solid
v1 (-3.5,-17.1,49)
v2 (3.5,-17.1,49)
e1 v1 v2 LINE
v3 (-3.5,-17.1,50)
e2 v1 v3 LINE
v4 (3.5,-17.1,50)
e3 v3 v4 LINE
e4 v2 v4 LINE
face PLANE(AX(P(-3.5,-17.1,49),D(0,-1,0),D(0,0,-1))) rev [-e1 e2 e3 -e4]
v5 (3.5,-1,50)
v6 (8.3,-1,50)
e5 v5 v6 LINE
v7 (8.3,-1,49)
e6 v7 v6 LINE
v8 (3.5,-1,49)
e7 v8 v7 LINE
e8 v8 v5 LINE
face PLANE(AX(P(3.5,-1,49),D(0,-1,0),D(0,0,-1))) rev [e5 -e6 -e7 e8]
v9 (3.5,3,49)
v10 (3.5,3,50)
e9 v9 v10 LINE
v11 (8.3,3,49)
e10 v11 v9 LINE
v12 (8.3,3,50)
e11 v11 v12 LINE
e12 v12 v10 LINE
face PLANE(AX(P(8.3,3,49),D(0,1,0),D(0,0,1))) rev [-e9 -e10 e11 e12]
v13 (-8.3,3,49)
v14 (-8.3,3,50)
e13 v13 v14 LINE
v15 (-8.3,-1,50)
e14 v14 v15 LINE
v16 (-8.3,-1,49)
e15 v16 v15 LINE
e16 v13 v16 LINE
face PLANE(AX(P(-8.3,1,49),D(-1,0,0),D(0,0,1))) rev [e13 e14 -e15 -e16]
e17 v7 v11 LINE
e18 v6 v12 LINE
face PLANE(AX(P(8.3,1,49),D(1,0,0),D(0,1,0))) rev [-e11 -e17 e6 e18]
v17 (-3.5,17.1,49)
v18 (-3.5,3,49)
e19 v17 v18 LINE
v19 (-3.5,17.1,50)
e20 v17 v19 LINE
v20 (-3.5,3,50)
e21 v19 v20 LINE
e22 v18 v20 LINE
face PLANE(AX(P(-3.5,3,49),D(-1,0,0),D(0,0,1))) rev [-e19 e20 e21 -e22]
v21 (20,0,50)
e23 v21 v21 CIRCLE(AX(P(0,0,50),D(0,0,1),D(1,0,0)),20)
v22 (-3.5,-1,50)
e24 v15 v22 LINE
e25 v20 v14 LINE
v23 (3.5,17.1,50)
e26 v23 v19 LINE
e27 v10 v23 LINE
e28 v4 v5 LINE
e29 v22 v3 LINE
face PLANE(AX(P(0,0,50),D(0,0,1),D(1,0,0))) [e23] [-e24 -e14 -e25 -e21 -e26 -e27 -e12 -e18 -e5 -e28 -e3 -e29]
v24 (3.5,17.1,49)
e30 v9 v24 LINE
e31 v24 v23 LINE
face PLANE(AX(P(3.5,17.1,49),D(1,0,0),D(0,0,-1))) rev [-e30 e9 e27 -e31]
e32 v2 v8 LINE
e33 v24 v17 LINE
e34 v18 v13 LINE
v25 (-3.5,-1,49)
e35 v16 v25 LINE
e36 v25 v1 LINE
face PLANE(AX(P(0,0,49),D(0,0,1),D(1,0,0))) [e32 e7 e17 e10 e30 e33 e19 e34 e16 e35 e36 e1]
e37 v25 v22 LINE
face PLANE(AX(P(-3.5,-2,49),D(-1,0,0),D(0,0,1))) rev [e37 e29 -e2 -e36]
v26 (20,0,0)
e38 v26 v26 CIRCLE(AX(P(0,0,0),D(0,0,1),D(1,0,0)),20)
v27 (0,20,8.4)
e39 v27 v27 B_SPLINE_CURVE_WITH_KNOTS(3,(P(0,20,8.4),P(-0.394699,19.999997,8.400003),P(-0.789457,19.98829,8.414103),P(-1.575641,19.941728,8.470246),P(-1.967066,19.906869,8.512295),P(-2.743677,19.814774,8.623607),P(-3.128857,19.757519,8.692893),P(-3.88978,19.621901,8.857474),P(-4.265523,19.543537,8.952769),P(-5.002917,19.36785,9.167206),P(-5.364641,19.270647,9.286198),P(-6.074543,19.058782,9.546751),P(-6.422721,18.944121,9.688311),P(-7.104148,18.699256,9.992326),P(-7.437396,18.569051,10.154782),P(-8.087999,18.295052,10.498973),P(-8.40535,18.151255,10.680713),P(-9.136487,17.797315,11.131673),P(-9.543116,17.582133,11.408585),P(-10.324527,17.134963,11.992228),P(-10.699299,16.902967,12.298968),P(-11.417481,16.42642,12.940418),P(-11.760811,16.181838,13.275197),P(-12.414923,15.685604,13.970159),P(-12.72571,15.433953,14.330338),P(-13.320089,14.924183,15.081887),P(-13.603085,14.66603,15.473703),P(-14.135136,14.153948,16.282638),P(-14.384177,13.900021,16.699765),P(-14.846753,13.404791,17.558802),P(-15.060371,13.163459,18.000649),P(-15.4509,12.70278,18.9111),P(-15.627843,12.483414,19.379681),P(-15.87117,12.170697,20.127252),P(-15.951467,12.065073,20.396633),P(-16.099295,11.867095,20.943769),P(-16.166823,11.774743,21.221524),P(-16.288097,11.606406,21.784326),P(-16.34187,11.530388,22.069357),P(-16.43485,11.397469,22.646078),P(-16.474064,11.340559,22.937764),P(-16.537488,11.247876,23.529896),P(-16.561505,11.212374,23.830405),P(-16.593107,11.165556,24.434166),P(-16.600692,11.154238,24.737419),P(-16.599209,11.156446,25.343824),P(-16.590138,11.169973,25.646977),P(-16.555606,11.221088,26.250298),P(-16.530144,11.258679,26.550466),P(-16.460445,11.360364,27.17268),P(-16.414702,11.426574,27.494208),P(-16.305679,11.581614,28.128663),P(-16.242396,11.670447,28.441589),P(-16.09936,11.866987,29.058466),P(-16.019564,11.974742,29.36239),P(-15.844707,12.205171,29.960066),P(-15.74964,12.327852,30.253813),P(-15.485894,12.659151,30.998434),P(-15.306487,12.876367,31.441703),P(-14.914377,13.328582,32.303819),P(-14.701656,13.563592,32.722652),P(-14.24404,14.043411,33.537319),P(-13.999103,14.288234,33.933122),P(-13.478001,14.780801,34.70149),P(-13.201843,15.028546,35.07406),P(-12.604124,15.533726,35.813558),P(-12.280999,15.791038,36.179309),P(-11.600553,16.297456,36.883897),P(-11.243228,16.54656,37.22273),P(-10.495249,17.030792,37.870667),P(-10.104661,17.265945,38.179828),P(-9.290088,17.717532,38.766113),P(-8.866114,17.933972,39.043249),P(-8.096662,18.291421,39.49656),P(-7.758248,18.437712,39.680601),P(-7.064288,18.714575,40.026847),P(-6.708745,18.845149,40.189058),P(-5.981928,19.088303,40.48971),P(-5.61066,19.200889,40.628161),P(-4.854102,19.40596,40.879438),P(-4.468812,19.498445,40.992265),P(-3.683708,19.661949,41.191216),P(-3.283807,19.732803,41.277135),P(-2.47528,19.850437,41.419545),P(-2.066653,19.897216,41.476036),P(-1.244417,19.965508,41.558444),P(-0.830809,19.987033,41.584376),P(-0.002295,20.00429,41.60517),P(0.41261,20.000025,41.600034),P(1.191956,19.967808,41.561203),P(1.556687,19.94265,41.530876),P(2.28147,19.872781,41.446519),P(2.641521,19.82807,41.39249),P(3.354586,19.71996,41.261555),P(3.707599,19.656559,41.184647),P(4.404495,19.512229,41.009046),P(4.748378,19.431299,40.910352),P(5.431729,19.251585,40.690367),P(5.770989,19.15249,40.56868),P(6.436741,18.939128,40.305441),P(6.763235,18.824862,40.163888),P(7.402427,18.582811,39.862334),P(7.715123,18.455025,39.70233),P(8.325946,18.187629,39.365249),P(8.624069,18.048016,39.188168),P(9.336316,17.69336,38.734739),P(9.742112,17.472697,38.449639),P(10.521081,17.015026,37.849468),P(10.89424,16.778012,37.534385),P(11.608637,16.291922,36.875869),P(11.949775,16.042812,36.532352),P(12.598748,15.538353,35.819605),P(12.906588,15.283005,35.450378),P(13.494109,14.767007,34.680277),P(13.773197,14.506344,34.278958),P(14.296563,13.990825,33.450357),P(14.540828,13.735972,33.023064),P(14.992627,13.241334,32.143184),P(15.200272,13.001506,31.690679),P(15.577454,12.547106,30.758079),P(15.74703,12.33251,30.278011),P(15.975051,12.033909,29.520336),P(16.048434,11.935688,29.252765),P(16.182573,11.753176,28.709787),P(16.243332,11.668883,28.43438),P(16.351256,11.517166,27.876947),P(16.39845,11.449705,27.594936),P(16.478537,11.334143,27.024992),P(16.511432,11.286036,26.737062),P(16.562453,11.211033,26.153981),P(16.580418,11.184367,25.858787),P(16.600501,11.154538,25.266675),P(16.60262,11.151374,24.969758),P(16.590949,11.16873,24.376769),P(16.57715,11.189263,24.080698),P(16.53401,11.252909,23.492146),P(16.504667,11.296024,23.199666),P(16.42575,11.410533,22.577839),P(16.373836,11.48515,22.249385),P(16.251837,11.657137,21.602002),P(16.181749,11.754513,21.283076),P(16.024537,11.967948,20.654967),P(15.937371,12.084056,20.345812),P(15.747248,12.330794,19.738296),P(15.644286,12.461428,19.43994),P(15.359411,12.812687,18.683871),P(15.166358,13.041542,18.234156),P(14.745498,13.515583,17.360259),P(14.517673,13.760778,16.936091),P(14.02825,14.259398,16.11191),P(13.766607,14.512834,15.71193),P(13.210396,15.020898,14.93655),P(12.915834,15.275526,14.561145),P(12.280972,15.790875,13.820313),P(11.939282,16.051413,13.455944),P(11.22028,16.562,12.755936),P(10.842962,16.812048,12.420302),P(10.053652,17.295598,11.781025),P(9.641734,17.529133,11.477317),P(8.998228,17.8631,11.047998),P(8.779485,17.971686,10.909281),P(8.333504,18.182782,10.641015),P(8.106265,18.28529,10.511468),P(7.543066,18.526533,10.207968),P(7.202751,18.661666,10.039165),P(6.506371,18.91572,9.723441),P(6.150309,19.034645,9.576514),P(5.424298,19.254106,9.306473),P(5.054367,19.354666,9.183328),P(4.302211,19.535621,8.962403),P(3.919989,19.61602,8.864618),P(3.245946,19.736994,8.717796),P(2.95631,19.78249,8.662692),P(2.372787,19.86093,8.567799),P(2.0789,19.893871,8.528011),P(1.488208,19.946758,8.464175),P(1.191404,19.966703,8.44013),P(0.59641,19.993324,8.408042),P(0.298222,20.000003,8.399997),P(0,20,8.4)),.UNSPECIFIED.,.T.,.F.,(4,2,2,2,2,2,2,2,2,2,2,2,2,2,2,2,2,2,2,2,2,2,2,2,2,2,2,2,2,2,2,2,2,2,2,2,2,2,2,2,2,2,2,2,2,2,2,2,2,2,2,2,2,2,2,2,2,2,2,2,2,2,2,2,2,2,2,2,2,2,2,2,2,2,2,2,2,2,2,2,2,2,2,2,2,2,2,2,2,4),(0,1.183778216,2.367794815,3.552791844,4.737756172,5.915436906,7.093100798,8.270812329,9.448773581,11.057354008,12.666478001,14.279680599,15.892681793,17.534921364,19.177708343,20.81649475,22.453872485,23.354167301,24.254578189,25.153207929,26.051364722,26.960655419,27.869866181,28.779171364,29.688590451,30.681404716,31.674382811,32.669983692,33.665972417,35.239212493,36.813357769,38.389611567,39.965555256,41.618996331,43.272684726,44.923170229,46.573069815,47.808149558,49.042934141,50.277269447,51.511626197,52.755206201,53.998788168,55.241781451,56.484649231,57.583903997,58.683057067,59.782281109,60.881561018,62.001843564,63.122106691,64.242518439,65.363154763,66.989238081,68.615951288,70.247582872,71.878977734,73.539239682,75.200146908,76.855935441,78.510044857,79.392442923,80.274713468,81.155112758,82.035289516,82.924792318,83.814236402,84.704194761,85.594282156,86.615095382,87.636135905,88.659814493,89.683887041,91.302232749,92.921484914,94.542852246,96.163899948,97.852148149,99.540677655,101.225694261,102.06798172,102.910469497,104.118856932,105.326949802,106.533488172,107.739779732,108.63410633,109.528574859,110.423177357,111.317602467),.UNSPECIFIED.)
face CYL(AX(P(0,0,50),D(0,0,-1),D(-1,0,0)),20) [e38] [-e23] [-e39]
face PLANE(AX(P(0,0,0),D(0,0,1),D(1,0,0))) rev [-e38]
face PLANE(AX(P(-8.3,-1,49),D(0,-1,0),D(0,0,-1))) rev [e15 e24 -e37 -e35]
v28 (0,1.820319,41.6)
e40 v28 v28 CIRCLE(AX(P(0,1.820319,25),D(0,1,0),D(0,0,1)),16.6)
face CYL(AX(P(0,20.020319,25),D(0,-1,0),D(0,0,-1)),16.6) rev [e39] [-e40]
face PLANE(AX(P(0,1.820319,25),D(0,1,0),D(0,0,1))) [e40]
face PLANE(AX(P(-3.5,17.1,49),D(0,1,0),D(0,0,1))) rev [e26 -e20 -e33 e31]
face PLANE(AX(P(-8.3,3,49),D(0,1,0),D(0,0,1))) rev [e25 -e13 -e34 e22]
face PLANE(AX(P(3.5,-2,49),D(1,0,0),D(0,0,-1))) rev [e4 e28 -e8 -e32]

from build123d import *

# Parameters (mm, degrees)
CROQUIS1_R              = 20
SALIENTE_EXTRUIR1_DEPTH = 50
CROQUIS3D1_R            = 16.6
CORTAR_EXTRUIR2_DEPTH   = 12.2
CORTAR_EXTRUIR4_DEPTH   = 1
CROQUIS10_R             = 16.6
CORTAR_EXTRUIR5_DEPTH   = 6


with BuildPart() as part:
    # Croquis1 → Saliente-Extruir1 (new body)
    with BuildSketch(Plane.XY):
        Circle(CROQUIS1_R)
    extrude(amount=SALIENTE_EXTRUIR1_DEPTH)

    # Croquis3D1 → Cortar-Extruir2 (cut)
    with BuildSketch(Plane(origin=(0, 20.020318539, 25), x_dir=(1, 0, 0), z_dir=(0, -1, 0))):
        Circle(CROQUIS3D1_R)
    extrude(amount=CORTAR_EXTRUIR2_DEPTH, mode=Mode.SUBTRACT)

    # Croquis4 → Cortar-Extruir4 (cut)
    with BuildSketch(Plane.XY.offset(50)):
        Polygon((8.3, 3), (3.5, 3), (3.5, 17.1), (-3.5, 17.1), (-3.5, 3), (-8.3, 3), (-8.3, 1), (-8.3, -1), (-3.5, -1), (-3.5, -2), (-3.5, -17.1), (3.5, -17.1), (3.5, -2), (3.5, -1), (8.3, -1), (8.3, 1), align=None)
    extrude(amount=-CORTAR_EXTRUIR4_DEPTH, mode=Mode.SUBTRACT)

    # Croquis10 → Cortar-Extruir5 (cut)
    with BuildSketch(Plane(origin=(0, 7.820318539, 0), x_dir=(1, 0, 0), z_dir=(0, 1, 0))):
        with Locations((0, -25)):
            Circle(CROQUIS10_R)
    extrude(amount=-CORTAR_EXTRUIR5_DEPTH, mode=Mode.SUBTRACT)


solid = part.part
